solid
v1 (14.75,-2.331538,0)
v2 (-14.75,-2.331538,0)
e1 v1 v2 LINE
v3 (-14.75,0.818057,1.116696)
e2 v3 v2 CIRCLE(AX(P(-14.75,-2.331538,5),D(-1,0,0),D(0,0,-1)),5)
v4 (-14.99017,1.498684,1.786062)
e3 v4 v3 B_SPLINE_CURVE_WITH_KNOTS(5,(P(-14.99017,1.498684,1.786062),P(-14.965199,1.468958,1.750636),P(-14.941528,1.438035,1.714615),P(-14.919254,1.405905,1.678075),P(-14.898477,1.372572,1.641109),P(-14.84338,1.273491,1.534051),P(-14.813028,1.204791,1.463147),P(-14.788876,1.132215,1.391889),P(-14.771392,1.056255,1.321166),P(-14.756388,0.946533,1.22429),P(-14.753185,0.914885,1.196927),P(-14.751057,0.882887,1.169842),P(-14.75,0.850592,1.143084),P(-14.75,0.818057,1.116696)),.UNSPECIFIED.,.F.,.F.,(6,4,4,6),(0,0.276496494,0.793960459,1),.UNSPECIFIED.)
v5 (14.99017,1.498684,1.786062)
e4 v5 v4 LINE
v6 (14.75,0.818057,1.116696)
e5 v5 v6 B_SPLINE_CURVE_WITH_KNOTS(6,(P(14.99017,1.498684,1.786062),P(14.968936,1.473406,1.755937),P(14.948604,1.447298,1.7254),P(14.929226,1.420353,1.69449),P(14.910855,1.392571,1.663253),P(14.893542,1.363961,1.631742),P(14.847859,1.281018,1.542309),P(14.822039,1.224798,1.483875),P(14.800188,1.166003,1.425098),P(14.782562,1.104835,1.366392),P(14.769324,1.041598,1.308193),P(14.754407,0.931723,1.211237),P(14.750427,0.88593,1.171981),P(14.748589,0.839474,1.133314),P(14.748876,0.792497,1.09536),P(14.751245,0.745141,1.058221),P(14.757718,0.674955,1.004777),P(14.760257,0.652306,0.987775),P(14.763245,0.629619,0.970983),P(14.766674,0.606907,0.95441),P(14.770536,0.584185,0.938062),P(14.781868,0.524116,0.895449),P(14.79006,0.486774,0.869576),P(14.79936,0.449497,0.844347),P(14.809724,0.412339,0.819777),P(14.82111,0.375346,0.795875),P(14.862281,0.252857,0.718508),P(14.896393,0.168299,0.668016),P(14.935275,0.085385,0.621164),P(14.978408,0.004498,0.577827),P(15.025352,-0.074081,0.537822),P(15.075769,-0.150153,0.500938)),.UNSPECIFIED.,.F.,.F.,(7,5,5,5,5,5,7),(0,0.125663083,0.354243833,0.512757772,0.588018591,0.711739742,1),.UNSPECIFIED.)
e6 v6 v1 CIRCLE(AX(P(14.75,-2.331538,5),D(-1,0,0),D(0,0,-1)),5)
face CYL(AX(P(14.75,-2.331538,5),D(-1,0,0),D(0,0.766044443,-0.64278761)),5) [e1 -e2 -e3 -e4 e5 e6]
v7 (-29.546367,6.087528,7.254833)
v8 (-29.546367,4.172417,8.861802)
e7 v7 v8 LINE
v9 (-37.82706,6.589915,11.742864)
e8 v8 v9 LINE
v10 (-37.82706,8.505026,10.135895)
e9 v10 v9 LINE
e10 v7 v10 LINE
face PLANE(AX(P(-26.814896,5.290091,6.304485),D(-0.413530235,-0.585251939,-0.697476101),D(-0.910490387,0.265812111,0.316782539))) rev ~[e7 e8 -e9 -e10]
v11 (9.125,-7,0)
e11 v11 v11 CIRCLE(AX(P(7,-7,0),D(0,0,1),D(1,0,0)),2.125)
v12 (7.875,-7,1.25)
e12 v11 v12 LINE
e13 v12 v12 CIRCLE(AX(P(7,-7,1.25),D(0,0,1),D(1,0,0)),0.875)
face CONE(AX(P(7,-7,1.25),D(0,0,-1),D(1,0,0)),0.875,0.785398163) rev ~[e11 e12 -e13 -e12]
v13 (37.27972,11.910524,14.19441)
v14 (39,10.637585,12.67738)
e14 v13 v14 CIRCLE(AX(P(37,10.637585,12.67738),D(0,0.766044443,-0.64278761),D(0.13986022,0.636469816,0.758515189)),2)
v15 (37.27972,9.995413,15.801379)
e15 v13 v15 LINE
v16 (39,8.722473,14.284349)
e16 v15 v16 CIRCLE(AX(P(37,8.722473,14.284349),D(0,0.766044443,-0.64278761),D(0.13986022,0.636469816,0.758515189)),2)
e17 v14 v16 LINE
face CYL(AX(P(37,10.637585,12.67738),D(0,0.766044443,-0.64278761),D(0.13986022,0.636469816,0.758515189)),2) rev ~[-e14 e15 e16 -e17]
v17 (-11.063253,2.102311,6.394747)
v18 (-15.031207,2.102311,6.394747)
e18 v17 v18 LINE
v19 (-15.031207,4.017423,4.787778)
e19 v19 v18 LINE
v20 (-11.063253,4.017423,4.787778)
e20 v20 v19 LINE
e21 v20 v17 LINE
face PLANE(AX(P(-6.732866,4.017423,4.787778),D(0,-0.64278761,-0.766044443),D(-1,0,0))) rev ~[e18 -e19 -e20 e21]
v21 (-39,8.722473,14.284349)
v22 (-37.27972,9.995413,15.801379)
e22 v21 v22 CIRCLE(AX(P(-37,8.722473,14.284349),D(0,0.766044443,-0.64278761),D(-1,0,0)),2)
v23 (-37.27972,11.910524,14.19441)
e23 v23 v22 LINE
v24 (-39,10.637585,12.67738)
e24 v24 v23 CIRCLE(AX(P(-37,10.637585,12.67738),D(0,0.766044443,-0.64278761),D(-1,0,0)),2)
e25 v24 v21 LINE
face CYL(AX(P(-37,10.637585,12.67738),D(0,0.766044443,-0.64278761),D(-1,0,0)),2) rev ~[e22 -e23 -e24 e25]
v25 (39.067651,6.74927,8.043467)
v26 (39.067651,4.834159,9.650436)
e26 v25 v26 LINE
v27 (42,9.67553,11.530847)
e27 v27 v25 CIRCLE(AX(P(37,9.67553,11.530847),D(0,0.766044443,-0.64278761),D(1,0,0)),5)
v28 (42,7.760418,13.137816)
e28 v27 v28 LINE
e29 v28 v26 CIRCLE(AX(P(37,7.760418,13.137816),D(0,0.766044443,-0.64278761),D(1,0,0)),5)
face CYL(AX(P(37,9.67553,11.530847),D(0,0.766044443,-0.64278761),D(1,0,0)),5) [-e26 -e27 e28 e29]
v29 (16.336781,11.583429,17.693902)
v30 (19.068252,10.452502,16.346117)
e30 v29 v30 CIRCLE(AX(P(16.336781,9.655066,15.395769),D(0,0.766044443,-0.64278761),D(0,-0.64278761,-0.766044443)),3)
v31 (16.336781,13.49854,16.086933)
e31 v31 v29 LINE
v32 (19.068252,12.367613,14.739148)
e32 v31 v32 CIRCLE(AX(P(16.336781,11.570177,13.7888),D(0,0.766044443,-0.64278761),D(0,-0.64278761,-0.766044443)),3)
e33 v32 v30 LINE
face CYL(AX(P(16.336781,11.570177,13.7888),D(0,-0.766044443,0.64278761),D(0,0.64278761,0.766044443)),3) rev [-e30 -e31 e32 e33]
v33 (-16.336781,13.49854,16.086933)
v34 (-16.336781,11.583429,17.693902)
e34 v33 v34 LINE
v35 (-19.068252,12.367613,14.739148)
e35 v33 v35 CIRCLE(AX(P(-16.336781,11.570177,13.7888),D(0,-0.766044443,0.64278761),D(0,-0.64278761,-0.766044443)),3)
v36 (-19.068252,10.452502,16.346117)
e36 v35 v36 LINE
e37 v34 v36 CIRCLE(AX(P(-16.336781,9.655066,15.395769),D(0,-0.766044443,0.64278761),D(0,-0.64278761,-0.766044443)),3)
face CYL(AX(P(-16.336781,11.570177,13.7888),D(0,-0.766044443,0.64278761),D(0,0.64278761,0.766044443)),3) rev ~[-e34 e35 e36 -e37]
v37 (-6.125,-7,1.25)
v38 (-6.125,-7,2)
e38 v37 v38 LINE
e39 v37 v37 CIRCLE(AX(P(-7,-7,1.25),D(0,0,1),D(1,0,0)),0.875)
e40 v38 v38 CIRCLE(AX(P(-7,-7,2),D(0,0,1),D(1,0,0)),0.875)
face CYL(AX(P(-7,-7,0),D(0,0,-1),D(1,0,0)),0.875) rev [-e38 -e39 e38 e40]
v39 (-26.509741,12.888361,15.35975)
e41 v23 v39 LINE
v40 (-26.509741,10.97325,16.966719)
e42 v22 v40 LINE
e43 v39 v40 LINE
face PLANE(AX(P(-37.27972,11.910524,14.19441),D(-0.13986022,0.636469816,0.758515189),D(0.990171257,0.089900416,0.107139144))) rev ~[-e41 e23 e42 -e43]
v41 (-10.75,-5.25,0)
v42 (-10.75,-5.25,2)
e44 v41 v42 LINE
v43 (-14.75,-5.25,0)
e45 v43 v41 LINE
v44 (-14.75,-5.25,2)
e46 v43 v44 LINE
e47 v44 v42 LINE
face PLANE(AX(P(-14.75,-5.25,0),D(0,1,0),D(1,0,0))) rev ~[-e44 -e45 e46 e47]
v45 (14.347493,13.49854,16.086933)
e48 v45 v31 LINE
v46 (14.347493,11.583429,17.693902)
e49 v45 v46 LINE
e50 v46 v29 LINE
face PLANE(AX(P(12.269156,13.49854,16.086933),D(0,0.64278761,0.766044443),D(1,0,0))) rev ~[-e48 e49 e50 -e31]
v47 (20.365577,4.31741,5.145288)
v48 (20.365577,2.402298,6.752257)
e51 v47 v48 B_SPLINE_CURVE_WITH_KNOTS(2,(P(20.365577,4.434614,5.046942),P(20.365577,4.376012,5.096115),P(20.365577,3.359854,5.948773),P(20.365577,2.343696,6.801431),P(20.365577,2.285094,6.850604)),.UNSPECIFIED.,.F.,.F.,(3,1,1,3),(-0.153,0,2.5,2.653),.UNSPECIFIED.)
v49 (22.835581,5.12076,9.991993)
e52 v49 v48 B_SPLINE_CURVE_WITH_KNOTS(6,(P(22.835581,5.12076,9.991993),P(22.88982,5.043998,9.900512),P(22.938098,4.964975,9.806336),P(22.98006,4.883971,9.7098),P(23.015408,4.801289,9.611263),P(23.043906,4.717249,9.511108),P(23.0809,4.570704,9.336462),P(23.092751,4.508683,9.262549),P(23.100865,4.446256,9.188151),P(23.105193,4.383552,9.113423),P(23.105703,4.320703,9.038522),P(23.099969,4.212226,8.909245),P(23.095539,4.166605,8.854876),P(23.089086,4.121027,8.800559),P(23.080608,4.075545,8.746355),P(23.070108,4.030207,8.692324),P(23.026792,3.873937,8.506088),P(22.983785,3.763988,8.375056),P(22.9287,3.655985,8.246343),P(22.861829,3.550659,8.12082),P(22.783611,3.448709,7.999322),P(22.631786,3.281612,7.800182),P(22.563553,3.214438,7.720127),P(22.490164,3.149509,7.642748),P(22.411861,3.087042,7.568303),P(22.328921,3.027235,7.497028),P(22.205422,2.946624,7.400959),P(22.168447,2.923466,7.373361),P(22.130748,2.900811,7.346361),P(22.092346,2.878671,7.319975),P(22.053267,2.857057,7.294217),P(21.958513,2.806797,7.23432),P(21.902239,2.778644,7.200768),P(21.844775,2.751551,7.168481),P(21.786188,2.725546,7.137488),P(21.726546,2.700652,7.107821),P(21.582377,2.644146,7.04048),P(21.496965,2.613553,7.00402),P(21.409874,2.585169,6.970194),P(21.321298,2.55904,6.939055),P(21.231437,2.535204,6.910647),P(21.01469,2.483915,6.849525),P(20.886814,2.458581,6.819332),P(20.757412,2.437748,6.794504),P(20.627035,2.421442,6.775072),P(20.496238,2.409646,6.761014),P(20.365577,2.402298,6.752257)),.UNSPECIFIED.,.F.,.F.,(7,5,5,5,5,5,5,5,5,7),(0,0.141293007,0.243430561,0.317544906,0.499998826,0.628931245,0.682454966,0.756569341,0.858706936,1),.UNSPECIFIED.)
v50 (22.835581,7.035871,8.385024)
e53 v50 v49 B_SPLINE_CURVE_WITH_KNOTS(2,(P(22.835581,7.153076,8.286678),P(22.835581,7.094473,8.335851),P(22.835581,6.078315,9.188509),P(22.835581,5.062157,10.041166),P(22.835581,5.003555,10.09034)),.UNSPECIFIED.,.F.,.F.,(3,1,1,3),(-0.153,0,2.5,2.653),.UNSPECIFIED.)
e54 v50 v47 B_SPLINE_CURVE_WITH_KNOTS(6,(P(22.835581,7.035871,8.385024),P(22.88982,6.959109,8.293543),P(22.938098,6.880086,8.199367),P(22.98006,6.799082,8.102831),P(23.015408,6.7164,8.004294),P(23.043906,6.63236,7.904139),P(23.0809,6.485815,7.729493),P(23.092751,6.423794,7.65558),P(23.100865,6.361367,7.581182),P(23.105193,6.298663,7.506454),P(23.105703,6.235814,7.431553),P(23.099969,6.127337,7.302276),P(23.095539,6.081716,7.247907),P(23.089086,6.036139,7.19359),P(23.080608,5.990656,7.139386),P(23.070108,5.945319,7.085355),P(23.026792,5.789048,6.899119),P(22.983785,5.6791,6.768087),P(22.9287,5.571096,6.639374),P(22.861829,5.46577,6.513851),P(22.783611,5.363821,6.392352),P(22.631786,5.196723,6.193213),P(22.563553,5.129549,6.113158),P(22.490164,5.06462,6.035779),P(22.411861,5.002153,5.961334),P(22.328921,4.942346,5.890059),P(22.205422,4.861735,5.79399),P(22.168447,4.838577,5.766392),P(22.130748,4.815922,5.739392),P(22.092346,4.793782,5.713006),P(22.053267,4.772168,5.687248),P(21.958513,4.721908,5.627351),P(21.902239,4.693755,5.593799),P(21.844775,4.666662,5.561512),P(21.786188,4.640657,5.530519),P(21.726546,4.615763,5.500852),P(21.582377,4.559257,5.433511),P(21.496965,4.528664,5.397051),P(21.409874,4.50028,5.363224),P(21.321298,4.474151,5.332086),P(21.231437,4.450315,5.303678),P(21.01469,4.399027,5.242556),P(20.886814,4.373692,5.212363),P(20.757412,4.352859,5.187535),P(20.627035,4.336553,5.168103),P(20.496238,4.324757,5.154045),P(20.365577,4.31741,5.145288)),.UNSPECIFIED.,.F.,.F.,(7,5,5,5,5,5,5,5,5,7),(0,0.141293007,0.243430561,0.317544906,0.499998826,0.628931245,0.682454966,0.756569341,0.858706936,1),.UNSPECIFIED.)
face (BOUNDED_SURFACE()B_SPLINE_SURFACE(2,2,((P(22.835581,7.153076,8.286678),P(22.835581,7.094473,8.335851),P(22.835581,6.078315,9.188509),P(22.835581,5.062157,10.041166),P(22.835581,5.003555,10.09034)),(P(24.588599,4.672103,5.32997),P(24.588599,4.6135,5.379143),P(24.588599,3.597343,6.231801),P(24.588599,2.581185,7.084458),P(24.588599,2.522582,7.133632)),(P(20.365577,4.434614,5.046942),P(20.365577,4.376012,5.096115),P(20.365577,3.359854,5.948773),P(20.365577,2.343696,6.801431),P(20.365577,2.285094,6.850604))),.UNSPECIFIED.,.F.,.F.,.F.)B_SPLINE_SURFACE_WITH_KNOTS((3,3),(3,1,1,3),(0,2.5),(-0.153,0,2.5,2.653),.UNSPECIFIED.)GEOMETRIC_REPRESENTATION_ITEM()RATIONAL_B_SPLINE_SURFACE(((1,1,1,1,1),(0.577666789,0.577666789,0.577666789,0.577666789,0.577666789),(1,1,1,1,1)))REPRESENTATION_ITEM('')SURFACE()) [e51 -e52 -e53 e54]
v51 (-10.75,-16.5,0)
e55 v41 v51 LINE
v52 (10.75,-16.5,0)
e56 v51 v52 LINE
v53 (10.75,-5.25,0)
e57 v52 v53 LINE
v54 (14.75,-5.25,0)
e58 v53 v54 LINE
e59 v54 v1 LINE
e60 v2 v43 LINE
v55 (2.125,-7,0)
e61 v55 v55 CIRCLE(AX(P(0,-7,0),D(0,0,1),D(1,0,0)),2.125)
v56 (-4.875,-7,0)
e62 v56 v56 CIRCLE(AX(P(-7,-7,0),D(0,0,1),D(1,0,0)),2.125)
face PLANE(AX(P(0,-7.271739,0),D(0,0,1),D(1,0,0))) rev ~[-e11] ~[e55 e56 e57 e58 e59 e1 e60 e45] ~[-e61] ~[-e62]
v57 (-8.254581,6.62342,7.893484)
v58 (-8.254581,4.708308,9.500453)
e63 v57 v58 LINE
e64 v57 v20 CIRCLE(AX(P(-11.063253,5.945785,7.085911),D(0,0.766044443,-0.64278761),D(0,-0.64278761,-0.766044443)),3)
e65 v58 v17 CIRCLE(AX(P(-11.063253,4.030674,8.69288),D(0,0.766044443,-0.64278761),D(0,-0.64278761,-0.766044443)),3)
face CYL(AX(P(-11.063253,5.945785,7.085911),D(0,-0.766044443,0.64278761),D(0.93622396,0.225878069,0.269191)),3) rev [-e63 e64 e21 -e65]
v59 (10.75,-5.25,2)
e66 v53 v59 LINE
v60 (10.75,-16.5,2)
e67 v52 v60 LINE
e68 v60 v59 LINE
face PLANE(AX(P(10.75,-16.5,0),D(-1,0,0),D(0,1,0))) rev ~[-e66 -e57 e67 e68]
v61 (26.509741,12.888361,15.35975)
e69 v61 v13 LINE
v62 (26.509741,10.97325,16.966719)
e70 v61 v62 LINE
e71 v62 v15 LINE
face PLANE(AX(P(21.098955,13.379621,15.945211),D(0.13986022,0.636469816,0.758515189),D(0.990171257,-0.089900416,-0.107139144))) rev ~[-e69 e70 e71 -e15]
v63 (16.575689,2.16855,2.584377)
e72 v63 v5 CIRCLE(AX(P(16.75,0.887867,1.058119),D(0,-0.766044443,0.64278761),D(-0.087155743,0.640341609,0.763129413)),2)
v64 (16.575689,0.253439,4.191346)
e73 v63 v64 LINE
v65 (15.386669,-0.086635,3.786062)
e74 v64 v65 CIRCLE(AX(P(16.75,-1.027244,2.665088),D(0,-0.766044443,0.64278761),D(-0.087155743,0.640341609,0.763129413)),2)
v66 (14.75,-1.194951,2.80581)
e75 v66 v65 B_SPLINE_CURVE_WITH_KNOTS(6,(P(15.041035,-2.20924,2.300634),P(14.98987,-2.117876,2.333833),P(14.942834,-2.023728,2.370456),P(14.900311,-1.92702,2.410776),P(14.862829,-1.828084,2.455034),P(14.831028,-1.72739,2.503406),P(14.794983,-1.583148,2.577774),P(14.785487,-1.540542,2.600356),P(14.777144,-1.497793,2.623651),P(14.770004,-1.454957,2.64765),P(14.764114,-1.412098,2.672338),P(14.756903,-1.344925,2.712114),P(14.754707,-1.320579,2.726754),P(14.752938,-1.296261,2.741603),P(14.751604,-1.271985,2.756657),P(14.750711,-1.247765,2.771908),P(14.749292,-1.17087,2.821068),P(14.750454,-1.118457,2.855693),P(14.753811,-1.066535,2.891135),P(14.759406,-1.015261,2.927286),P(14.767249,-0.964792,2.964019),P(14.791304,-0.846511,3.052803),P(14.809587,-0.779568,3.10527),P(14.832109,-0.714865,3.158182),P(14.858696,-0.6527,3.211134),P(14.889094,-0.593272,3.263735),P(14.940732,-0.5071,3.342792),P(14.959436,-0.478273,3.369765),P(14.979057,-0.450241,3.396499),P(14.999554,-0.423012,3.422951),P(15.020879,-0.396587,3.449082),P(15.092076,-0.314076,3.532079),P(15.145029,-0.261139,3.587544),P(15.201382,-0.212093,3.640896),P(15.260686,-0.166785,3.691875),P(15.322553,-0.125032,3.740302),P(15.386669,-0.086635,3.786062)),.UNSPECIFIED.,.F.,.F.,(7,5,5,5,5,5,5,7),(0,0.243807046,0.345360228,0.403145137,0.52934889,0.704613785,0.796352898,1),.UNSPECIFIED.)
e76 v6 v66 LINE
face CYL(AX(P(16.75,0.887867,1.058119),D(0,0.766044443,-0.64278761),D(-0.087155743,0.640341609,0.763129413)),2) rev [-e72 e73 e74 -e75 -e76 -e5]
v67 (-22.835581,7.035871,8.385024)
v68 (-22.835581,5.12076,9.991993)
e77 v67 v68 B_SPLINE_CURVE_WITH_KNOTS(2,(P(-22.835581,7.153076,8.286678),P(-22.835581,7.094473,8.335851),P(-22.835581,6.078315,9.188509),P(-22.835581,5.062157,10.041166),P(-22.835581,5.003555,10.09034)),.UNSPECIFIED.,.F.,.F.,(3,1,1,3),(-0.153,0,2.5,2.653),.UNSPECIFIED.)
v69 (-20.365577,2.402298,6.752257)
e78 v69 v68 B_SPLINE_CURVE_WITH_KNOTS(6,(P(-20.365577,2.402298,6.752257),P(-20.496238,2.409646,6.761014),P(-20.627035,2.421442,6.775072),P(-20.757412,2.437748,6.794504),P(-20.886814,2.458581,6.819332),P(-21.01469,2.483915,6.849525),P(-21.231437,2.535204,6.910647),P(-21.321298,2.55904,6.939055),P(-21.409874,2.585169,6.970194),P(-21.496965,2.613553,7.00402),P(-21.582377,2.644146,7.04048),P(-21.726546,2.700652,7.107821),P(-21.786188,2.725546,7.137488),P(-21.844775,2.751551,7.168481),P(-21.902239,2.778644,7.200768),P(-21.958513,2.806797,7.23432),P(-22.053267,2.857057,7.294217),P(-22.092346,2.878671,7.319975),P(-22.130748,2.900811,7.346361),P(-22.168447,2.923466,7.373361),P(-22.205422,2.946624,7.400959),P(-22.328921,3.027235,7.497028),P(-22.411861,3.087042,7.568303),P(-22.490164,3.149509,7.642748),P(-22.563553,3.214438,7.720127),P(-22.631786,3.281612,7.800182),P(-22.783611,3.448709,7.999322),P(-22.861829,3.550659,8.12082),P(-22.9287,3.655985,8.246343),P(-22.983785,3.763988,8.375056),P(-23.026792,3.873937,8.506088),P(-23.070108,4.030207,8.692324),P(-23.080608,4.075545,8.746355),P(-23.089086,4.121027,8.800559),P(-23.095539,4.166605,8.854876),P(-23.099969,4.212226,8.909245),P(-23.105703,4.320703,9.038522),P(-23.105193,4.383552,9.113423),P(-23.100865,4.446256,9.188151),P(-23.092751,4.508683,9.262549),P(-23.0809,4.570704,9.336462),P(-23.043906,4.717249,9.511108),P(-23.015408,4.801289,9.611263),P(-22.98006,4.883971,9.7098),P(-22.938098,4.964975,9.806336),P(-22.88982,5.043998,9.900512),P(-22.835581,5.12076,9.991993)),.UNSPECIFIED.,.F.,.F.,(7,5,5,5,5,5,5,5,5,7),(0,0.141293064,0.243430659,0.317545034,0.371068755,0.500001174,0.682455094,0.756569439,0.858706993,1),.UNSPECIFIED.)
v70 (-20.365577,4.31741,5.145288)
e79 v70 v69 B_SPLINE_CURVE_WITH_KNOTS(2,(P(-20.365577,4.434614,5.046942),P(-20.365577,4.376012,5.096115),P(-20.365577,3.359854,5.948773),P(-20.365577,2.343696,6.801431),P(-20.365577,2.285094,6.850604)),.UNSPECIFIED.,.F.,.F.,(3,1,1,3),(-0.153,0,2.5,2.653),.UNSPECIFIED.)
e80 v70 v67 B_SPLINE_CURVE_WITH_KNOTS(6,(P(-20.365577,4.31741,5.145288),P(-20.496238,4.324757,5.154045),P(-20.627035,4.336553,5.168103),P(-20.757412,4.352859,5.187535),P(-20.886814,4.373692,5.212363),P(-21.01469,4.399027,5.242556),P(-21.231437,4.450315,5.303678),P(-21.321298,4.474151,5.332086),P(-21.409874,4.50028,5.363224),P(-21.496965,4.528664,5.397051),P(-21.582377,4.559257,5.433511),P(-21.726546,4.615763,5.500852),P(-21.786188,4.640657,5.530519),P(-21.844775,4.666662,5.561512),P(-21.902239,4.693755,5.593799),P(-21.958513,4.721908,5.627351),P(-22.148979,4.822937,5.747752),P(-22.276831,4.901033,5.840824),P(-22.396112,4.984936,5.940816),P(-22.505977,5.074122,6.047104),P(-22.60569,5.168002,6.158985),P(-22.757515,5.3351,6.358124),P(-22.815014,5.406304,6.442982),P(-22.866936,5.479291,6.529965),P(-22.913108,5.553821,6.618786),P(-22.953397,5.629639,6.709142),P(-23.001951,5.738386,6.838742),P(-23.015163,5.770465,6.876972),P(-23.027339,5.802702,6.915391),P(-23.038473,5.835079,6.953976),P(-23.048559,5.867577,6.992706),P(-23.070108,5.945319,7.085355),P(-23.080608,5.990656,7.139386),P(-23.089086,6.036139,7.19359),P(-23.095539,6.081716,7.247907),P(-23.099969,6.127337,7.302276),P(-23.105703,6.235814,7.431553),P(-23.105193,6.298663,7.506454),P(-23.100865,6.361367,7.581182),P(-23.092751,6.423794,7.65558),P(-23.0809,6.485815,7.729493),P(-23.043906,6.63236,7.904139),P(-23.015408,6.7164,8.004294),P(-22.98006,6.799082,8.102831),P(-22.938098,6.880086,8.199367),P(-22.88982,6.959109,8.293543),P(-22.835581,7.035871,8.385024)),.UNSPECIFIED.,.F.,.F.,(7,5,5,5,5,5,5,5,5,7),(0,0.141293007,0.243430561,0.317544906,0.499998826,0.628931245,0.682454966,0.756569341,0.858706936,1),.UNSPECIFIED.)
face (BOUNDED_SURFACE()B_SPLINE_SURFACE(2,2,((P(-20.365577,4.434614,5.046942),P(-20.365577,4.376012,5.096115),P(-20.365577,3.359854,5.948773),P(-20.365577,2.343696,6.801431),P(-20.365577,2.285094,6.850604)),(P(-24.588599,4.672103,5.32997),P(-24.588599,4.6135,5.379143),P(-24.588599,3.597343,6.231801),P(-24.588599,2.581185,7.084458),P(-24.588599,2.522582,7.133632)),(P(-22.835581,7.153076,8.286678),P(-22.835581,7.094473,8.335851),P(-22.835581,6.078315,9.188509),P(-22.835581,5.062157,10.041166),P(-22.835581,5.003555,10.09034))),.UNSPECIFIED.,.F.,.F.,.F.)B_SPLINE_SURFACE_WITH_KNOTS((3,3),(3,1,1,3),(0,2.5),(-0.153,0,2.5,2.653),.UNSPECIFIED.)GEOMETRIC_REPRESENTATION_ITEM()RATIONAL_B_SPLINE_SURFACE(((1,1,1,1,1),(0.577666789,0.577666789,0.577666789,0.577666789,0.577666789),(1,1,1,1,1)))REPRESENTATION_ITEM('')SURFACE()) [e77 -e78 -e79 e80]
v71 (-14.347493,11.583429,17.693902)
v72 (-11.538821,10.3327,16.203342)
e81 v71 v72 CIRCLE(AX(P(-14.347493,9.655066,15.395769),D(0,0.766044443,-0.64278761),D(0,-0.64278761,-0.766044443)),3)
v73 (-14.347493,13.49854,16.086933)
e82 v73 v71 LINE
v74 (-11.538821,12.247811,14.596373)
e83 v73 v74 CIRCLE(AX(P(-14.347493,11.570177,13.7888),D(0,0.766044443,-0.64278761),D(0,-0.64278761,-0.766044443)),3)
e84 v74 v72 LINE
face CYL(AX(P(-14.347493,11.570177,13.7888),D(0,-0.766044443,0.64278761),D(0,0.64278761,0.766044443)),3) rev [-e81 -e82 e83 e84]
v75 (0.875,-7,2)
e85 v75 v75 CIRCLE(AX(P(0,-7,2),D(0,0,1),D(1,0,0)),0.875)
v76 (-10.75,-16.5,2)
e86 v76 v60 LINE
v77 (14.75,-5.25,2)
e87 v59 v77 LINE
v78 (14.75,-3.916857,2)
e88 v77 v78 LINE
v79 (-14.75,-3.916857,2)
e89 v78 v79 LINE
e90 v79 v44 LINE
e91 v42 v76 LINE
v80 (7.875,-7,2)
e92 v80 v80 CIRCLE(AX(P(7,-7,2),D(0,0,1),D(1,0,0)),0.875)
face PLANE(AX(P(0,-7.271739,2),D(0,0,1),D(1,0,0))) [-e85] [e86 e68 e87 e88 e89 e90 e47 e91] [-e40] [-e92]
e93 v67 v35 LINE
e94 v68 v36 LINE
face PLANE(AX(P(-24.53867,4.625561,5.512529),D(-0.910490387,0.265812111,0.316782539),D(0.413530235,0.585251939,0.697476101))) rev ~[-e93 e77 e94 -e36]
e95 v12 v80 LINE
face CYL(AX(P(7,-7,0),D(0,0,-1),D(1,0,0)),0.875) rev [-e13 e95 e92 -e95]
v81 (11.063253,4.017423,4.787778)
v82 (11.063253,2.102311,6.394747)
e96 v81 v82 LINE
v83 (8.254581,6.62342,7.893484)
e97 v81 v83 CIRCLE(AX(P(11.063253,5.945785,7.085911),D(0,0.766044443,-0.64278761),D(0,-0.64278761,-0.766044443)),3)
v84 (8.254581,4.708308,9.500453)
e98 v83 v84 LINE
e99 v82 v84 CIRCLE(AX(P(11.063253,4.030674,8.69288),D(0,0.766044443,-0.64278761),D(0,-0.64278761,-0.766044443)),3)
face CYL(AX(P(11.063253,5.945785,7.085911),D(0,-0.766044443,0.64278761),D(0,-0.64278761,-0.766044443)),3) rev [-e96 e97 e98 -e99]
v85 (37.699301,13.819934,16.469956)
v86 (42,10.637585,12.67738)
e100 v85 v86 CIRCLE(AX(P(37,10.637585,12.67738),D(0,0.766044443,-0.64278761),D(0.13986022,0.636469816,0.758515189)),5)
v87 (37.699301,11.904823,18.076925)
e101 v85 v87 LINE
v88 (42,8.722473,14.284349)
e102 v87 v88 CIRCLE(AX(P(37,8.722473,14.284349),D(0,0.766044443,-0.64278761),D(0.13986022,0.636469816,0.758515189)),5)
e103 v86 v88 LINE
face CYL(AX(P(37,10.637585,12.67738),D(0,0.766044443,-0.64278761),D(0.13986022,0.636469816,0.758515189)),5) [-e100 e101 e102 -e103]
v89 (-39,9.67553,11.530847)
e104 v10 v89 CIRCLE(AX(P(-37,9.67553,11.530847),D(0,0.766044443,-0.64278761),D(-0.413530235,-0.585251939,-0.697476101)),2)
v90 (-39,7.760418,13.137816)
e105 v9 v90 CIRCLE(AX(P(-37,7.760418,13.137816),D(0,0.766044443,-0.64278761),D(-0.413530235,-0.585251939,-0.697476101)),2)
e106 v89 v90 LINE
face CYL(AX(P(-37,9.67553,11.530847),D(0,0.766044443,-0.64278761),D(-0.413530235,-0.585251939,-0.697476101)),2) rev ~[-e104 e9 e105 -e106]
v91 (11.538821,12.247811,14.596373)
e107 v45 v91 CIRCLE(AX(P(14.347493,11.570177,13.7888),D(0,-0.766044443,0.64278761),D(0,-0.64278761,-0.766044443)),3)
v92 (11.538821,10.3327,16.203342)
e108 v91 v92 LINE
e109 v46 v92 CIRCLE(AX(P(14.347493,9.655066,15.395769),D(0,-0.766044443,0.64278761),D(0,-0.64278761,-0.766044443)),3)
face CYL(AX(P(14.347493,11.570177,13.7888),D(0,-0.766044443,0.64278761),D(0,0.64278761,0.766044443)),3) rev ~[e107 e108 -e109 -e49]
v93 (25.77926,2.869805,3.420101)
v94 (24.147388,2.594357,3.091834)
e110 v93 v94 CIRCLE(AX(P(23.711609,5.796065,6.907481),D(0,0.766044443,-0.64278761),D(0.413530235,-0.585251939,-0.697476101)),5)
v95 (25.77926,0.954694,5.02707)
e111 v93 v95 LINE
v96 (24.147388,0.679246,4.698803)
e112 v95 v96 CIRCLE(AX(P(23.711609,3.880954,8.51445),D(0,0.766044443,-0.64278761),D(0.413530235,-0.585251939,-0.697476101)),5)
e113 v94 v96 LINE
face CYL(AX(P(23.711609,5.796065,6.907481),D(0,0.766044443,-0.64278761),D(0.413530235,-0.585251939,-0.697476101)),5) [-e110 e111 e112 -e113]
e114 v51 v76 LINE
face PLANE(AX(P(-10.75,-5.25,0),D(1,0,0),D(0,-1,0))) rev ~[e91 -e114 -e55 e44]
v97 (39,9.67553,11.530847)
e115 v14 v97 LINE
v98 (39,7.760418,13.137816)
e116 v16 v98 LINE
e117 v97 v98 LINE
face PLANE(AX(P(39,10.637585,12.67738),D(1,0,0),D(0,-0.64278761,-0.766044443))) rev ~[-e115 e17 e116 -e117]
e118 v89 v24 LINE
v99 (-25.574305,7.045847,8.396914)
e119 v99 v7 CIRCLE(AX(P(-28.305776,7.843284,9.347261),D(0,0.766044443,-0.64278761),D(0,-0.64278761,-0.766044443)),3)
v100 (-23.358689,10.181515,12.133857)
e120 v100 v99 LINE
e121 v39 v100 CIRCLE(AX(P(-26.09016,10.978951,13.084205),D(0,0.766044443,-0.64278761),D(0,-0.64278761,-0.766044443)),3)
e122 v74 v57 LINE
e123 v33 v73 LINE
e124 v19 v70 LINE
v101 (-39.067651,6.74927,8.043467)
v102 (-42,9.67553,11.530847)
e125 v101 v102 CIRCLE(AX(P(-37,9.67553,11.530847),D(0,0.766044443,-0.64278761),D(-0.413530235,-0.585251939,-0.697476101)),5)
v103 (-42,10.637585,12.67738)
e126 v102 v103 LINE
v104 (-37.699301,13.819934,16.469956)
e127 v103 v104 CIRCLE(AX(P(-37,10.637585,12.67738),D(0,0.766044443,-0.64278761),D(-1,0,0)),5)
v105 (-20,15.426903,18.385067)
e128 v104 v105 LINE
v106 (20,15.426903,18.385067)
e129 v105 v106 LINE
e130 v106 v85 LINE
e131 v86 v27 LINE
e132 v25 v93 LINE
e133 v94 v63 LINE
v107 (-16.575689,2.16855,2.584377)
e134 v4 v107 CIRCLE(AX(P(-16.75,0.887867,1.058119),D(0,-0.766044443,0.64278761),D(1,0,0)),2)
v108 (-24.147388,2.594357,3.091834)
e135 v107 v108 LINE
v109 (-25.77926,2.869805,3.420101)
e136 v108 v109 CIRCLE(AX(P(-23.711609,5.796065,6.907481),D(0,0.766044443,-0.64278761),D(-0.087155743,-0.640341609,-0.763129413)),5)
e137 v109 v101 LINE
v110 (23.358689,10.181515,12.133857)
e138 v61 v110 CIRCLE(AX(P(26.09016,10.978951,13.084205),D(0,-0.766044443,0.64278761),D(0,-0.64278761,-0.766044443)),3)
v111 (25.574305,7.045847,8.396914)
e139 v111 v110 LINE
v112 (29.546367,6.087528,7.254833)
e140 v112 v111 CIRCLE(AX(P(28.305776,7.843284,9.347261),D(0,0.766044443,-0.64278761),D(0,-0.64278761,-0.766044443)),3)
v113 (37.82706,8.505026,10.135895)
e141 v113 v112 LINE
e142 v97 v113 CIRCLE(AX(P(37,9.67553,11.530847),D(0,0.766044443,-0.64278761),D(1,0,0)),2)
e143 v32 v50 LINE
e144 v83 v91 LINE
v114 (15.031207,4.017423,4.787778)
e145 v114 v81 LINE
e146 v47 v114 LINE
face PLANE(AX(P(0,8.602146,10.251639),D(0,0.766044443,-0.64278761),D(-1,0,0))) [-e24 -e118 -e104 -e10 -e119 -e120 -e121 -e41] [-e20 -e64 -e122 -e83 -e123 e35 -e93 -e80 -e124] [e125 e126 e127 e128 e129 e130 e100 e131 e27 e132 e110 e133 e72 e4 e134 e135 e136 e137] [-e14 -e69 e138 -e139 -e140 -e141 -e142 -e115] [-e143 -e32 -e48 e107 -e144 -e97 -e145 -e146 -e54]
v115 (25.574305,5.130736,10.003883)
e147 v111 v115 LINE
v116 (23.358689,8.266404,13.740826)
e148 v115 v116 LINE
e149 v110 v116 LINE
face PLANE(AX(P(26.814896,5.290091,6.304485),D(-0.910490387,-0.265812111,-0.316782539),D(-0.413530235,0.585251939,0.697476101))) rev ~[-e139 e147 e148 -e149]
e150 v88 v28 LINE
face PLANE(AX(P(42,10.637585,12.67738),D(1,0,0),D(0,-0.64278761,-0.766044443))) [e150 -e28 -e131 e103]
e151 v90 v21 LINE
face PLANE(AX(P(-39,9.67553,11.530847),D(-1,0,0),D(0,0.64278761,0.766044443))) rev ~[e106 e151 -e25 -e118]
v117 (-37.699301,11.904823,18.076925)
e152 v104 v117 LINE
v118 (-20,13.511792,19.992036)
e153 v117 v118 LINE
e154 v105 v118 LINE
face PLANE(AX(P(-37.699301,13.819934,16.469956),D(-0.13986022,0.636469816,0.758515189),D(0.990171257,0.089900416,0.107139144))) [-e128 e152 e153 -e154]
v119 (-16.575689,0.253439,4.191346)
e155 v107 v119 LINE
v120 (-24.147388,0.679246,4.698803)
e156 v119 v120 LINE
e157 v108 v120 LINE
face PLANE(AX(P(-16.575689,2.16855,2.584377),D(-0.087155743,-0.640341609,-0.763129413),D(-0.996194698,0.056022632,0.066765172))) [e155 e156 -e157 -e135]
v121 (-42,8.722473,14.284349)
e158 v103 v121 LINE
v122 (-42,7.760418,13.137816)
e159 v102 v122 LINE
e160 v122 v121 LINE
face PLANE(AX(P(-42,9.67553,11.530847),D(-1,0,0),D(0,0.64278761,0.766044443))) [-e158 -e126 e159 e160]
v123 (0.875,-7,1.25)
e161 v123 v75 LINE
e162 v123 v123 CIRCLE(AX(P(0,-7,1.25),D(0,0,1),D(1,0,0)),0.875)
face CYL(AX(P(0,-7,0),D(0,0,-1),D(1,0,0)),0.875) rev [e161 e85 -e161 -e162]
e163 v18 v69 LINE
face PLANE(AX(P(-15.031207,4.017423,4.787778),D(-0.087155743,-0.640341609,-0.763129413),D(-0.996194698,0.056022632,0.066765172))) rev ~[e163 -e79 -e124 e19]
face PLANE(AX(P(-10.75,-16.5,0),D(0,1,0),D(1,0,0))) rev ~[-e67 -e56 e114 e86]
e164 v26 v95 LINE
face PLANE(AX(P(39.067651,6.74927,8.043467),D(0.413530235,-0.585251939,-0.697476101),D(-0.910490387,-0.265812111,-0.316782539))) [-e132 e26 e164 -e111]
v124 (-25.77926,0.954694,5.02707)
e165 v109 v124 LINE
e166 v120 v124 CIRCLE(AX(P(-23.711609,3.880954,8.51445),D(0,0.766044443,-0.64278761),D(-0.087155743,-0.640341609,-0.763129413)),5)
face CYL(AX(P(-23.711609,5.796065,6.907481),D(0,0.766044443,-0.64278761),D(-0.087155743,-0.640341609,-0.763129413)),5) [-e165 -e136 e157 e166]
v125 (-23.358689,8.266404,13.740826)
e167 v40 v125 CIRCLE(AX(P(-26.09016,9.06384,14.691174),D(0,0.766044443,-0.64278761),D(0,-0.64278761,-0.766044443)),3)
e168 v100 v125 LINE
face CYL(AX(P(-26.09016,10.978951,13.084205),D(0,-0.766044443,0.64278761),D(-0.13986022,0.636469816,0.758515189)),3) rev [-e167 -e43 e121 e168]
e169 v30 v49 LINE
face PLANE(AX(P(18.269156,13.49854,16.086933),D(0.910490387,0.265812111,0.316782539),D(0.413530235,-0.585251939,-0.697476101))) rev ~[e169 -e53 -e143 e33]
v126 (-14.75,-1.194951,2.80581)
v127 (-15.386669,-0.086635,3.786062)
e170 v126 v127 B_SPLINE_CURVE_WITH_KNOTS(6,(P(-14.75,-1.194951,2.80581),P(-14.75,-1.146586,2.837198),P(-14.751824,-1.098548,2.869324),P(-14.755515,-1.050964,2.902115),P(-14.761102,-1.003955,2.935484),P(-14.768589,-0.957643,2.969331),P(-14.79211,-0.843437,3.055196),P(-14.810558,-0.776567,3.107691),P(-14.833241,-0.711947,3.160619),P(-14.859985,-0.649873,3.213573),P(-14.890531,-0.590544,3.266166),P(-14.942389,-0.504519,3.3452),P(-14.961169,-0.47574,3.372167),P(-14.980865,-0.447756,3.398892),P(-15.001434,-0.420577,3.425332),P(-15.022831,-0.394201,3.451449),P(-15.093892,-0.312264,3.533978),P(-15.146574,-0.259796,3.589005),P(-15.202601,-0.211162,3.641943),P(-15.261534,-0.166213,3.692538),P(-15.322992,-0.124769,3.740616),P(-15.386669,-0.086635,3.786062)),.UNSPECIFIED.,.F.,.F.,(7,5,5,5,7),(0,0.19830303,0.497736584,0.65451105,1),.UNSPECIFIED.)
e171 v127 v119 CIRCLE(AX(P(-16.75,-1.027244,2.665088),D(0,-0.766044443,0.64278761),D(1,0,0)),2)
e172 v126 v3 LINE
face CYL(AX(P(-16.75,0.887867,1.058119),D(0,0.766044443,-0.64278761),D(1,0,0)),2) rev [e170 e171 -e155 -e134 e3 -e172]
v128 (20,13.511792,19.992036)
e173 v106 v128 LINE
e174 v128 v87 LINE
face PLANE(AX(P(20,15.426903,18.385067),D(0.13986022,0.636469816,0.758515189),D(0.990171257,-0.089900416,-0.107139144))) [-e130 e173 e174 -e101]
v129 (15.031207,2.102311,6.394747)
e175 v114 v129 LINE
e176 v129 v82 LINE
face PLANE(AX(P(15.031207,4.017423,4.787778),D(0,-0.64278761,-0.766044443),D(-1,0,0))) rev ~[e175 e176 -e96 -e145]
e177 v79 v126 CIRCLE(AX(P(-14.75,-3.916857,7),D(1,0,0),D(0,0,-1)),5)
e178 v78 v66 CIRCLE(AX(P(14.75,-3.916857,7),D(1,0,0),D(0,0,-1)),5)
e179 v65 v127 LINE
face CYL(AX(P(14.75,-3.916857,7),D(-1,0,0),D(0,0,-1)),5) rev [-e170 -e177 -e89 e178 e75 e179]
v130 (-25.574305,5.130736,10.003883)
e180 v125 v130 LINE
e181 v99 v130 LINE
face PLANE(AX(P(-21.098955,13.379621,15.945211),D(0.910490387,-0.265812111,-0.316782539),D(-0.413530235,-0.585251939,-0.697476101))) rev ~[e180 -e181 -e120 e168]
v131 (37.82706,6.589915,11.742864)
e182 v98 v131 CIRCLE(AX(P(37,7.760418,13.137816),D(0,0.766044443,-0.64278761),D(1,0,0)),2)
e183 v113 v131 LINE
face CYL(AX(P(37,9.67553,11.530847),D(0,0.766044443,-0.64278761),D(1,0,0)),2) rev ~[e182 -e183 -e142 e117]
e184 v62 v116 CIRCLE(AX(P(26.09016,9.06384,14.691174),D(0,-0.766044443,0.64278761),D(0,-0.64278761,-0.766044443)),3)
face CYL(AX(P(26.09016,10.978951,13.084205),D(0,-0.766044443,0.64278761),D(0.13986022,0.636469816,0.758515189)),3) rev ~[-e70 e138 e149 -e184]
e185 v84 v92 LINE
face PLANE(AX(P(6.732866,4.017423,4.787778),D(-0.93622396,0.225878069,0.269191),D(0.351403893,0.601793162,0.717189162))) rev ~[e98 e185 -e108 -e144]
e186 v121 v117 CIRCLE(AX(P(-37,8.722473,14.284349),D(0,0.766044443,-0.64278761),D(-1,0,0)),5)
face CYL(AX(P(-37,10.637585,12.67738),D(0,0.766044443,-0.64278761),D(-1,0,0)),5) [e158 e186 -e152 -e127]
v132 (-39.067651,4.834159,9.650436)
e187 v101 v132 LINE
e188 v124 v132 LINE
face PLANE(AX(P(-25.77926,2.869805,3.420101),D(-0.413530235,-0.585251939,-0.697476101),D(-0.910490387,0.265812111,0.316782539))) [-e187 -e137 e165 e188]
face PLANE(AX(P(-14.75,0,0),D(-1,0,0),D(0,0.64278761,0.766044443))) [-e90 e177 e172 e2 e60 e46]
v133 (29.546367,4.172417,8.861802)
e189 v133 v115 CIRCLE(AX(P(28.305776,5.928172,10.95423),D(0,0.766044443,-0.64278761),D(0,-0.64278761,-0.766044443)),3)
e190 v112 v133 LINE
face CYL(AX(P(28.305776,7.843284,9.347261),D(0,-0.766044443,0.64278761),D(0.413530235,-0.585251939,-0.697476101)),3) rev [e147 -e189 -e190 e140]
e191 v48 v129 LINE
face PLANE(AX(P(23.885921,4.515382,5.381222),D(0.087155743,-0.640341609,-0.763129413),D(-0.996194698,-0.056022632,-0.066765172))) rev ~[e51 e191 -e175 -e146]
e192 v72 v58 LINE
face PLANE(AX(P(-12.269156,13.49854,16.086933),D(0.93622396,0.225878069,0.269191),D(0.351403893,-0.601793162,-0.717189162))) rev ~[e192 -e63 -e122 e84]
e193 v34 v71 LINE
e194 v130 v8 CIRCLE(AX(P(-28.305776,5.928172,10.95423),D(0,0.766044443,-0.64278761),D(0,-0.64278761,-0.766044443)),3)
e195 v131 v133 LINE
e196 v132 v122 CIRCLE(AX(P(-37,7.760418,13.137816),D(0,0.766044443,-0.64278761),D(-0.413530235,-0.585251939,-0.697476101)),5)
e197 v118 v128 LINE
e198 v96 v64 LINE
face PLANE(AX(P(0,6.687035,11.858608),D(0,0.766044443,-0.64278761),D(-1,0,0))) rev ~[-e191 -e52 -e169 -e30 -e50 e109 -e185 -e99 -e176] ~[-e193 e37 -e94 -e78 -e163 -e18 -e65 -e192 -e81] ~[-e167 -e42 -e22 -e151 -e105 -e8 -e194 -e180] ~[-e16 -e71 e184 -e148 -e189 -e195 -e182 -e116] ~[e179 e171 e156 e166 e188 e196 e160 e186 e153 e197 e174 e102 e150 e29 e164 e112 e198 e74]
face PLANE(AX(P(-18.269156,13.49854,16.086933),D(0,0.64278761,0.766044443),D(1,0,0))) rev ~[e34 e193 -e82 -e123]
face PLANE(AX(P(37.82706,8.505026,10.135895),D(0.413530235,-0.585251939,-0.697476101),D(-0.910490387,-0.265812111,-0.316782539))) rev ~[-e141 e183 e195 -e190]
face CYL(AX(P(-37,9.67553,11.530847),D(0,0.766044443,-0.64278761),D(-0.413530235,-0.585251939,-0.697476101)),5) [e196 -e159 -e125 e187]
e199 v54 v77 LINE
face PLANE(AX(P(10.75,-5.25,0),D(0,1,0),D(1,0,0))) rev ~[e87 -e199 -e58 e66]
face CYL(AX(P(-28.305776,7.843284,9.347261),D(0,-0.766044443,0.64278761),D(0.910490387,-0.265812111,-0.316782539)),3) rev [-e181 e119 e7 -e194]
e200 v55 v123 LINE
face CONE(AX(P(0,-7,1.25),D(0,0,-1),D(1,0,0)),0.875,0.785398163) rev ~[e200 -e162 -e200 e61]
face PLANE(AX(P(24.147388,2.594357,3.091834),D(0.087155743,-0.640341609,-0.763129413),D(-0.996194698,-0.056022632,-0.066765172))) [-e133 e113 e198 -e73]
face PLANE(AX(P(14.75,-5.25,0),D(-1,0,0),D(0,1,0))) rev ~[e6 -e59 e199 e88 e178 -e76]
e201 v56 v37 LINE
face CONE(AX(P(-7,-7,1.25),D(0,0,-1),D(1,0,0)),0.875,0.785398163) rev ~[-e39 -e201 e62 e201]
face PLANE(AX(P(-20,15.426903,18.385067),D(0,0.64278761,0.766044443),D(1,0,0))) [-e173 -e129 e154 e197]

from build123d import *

# Parameters (mm, degrees)
F0_R     = 0.875
F1_DEPTH = 2
F4_DEPTH = 2.5
F6_DEPTH = 25.4913661255
F7_R     = 5
F8_R     = 3
F9_SIZE  = 1.25


with BuildPart() as f1:
    # F0 (on Top) → F1 (new body)
    with BuildSketch(Plane.XY):
        Polygon((14.75, 0), (0, 0), (-14.75, 0), (-14.75, -5.25), (-10.75, -5.25), (-10.75, -16.5), (0, -16.5), (10.75, -16.5), (10.75, -5.25), (14.75, -5.25), align=None)
        with Locations((-7, -7)):
            Circle(F0_R, mode=Mode.SUBTRACT)
        with Locations((0, -7)):
            Circle(F0_R, mode=Mode.SUBTRACT)
        with Locations((7, -7)):
            Circle(F0_R, mode=Mode.SUBTRACT)
    extrude(amount=F1_DEPTH)

    # F3 (on face) → F4 (join)
    with BuildSketch(Plane(origin=(0, 0, 0), x_dir=(-1, 0, 0), z_dir=(0, 0.7660444431, -0.6427876097))):
        with BuildLine():
            Line((-14.75, 0), (14.75, 0))
            Line((14.75, 0), (14.75, 1.3812757004))
            ThreePointArc((14.75, 1.3812757004), (15.2754453264, 2.7324561156), (16.5756885145, 3.3736650966))
            Line((16.5756885145, 3.3736650966), (24.147387942, 4.0361029601))
            ThreePointArc((24.147387942, 4.0361029601), (24.9815296917, 4.1810344722), (25.7792604037, 4.464624516))
            Line((25.7792604037, 4.464624516), (39.0676511754, 10.5))
            ThreePointArc((39.0676511754, 10.5), (41.2034661814, 12.3448936136), (42, 15.0524519346))
            Line((42, 15.0524519346), (42, 16.5491437132))
            ThreePointArc((42, 16.5491437132), (40.7746857814, 19.8281294179), (37.6993010994, 21.5))
            Line((37.6993010994, 21.5), (20, 24))
            Line((20, 24), (0, 24))
            Line((0, 24), (-20, 24))
            Line((-20, 24), (-37.6993010994, 21.5))
            ThreePointArc((-37.6993010994, 21.5), (-40.7746857814, 19.8281294179), (-42, 16.5491437132))
            Line((-42, 16.5491437132), (-42, 15.0524519346))
            ThreePointArc((-42, 15.0524519346), (-41.2034661814, 12.3448936136), (-39.0676511754, 10.5))
            Line((-39.0676511754, 10.5), (-25.7792604037, 4.464624516))
            ThreePointArc((-25.7792604037, 4.464624516), (-24.9815296917, 4.1810344722), (-24.147387942, 4.0361029601))
            Line((-24.147387942, 4.0361029601), (-16.5756885145, 3.3736650966))
            ThreePointArc((-16.5756885145, 3.3736650966), (-15.2754453264, 2.7324561156), (-14.75, 1.3812757004))
            Line((-14.75, 1.3812757004), (-14.75, 0))
        make_face()
    extrude(amount=-F4_DEPTH)

    # F5 (on face) → F6 (cut, through all)
    with BuildSketch(Plane(origin=(0, 0, 0), x_dir=(-1, 0, 0), z_dir=(0, 0.7660444431, -0.6427876097))):
        with BuildLine():
            Line((-21.098955464, 20.8149952552), (-37.2797204398, 18.5294862279))
            ThreePointArc((-37.2797204398, 18.5294862279), (-38.5098743126, 17.8607379951), (-39, 16.5491437132))
            Line((-39, 16.5491437132), (-39, 15.0524519346))
            ThreePointArc((-39, 15.0524519346), (-38.6813864726, 13.9694286062), (-37.8270604702, 13.2314711608))
            Line((-37.8270604702, 13.2314711608), (-26.8148956657, 8.2299212644))
            Line((-26.8148956657, 8.2299212644), (-21.098955464, 20.8149952552))
        make_face()
        with BuildLine():
            Line((-12.2691561683, 21), (-18.2691561683, 21))
            Line((-18.2691561683, 21), (-24.5386696984, 7.1960956767))
            ThreePointArc((-24.5386696984, 7.1960956767), (-24.2195774136, 7.0826596592), (-23.8859207138, 7.0246870544))
            Line((-23.8859207138, 7.0246870544), (-15.0312071638, 6.25))
            Line((-15.0312071638, 6.25), (-6.732866085, 6.25))
            Line((-6.732866085, 6.25), (-12.2691561683, 21))
        make_face()
        with BuildLine():
            Line((18.2691561683, 21), (12.2691561683, 21))
            Line((12.2691561683, 21), (6.732866085, 6.25))
            Line((6.732866085, 6.25), (15.0312071638, 6.25))
            Line((15.0312071638, 6.25), (23.8859207138, 7.0246870544))
            ThreePointArc((23.8859207138, 7.0246870544), (24.2195774136, 7.0826596592), (24.5386696984, 7.1960956767))
            Line((24.5386696984, 7.1960956767), (18.2691561683, 21))
        make_face()
        with BuildLine():
            Line((37.2797204398, 18.5294862279), (21.098955464, 20.8149952552))
            Line((21.098955464, 20.8149952552), (26.8148956657, 8.2299212644))
            Line((26.8148956657, 8.2299212644), (37.8270604702, 13.2314711608))
            ThreePointArc((37.8270604702, 13.2314711608), (38.6813864726, 13.9694286062), (39, 15.0524519346))
            Line((39, 15.0524519346), (39, 16.5491437132))
            ThreePointArc((39, 16.5491437132), (38.5098743126, 17.8607379951), (37.2797204398, 18.5294862279))
        make_face()
    extrude(amount=-F6_DEPTH, mode=Mode.SUBTRACT)

    # F7 (call 1 of 2: OpenCascade refuses the feature's edges together)
    f7_edges = [f1.edges().sort_by_distance(p)[0] for p in [
        (0, -1.585319, 2),
    ]]
    fillet(f7_edges, radius=F7_R)

    # F7#2 (call 2 of 2)
    f7_2_edges = [f1.edges().sort_by_distance(p)[0] for p in [
        (0, 0, 0),
    ]]
    fillet(f7_2_edges, radius=F7_R)

    # F8
    f8_edges = [f1.edges().sort_by_distance(p)[0] for p in [
        (-21.098955, 12.422065, 16.748696),
        (-26.814896, 4.332536, 7.10797),
        (-24.53867, 3.668006, 6.316014),
        (-6.732866, 3.059867, 5.591262),
        (-12.269156, 12.540984, 16.890418),
        (-18.269156, 12.540984, 16.890418),
        (12.269156, 12.540984, 16.890418),
        (18.269156, 12.540984, 16.890418),
        (24.53867, 3.668006, 6.316014),
        (6.732866, 3.059867, 5.591262),
        (26.814896, 4.332536, 7.10797),
        (21.098955, 12.422065, 16.748696),
    ]]
    fillet(f8_edges, radius=F8_R)

    # F9
    f9_edges = [f1.edges().sort_by_distance(p)[0] for p in [
        (-7.875, -7, 0),
        (-0.875, -7, 0),
        (6.125, -7, 0),
    ]]
    chamfer(f9_edges, length=F9_SIZE)


solid = f1.part
